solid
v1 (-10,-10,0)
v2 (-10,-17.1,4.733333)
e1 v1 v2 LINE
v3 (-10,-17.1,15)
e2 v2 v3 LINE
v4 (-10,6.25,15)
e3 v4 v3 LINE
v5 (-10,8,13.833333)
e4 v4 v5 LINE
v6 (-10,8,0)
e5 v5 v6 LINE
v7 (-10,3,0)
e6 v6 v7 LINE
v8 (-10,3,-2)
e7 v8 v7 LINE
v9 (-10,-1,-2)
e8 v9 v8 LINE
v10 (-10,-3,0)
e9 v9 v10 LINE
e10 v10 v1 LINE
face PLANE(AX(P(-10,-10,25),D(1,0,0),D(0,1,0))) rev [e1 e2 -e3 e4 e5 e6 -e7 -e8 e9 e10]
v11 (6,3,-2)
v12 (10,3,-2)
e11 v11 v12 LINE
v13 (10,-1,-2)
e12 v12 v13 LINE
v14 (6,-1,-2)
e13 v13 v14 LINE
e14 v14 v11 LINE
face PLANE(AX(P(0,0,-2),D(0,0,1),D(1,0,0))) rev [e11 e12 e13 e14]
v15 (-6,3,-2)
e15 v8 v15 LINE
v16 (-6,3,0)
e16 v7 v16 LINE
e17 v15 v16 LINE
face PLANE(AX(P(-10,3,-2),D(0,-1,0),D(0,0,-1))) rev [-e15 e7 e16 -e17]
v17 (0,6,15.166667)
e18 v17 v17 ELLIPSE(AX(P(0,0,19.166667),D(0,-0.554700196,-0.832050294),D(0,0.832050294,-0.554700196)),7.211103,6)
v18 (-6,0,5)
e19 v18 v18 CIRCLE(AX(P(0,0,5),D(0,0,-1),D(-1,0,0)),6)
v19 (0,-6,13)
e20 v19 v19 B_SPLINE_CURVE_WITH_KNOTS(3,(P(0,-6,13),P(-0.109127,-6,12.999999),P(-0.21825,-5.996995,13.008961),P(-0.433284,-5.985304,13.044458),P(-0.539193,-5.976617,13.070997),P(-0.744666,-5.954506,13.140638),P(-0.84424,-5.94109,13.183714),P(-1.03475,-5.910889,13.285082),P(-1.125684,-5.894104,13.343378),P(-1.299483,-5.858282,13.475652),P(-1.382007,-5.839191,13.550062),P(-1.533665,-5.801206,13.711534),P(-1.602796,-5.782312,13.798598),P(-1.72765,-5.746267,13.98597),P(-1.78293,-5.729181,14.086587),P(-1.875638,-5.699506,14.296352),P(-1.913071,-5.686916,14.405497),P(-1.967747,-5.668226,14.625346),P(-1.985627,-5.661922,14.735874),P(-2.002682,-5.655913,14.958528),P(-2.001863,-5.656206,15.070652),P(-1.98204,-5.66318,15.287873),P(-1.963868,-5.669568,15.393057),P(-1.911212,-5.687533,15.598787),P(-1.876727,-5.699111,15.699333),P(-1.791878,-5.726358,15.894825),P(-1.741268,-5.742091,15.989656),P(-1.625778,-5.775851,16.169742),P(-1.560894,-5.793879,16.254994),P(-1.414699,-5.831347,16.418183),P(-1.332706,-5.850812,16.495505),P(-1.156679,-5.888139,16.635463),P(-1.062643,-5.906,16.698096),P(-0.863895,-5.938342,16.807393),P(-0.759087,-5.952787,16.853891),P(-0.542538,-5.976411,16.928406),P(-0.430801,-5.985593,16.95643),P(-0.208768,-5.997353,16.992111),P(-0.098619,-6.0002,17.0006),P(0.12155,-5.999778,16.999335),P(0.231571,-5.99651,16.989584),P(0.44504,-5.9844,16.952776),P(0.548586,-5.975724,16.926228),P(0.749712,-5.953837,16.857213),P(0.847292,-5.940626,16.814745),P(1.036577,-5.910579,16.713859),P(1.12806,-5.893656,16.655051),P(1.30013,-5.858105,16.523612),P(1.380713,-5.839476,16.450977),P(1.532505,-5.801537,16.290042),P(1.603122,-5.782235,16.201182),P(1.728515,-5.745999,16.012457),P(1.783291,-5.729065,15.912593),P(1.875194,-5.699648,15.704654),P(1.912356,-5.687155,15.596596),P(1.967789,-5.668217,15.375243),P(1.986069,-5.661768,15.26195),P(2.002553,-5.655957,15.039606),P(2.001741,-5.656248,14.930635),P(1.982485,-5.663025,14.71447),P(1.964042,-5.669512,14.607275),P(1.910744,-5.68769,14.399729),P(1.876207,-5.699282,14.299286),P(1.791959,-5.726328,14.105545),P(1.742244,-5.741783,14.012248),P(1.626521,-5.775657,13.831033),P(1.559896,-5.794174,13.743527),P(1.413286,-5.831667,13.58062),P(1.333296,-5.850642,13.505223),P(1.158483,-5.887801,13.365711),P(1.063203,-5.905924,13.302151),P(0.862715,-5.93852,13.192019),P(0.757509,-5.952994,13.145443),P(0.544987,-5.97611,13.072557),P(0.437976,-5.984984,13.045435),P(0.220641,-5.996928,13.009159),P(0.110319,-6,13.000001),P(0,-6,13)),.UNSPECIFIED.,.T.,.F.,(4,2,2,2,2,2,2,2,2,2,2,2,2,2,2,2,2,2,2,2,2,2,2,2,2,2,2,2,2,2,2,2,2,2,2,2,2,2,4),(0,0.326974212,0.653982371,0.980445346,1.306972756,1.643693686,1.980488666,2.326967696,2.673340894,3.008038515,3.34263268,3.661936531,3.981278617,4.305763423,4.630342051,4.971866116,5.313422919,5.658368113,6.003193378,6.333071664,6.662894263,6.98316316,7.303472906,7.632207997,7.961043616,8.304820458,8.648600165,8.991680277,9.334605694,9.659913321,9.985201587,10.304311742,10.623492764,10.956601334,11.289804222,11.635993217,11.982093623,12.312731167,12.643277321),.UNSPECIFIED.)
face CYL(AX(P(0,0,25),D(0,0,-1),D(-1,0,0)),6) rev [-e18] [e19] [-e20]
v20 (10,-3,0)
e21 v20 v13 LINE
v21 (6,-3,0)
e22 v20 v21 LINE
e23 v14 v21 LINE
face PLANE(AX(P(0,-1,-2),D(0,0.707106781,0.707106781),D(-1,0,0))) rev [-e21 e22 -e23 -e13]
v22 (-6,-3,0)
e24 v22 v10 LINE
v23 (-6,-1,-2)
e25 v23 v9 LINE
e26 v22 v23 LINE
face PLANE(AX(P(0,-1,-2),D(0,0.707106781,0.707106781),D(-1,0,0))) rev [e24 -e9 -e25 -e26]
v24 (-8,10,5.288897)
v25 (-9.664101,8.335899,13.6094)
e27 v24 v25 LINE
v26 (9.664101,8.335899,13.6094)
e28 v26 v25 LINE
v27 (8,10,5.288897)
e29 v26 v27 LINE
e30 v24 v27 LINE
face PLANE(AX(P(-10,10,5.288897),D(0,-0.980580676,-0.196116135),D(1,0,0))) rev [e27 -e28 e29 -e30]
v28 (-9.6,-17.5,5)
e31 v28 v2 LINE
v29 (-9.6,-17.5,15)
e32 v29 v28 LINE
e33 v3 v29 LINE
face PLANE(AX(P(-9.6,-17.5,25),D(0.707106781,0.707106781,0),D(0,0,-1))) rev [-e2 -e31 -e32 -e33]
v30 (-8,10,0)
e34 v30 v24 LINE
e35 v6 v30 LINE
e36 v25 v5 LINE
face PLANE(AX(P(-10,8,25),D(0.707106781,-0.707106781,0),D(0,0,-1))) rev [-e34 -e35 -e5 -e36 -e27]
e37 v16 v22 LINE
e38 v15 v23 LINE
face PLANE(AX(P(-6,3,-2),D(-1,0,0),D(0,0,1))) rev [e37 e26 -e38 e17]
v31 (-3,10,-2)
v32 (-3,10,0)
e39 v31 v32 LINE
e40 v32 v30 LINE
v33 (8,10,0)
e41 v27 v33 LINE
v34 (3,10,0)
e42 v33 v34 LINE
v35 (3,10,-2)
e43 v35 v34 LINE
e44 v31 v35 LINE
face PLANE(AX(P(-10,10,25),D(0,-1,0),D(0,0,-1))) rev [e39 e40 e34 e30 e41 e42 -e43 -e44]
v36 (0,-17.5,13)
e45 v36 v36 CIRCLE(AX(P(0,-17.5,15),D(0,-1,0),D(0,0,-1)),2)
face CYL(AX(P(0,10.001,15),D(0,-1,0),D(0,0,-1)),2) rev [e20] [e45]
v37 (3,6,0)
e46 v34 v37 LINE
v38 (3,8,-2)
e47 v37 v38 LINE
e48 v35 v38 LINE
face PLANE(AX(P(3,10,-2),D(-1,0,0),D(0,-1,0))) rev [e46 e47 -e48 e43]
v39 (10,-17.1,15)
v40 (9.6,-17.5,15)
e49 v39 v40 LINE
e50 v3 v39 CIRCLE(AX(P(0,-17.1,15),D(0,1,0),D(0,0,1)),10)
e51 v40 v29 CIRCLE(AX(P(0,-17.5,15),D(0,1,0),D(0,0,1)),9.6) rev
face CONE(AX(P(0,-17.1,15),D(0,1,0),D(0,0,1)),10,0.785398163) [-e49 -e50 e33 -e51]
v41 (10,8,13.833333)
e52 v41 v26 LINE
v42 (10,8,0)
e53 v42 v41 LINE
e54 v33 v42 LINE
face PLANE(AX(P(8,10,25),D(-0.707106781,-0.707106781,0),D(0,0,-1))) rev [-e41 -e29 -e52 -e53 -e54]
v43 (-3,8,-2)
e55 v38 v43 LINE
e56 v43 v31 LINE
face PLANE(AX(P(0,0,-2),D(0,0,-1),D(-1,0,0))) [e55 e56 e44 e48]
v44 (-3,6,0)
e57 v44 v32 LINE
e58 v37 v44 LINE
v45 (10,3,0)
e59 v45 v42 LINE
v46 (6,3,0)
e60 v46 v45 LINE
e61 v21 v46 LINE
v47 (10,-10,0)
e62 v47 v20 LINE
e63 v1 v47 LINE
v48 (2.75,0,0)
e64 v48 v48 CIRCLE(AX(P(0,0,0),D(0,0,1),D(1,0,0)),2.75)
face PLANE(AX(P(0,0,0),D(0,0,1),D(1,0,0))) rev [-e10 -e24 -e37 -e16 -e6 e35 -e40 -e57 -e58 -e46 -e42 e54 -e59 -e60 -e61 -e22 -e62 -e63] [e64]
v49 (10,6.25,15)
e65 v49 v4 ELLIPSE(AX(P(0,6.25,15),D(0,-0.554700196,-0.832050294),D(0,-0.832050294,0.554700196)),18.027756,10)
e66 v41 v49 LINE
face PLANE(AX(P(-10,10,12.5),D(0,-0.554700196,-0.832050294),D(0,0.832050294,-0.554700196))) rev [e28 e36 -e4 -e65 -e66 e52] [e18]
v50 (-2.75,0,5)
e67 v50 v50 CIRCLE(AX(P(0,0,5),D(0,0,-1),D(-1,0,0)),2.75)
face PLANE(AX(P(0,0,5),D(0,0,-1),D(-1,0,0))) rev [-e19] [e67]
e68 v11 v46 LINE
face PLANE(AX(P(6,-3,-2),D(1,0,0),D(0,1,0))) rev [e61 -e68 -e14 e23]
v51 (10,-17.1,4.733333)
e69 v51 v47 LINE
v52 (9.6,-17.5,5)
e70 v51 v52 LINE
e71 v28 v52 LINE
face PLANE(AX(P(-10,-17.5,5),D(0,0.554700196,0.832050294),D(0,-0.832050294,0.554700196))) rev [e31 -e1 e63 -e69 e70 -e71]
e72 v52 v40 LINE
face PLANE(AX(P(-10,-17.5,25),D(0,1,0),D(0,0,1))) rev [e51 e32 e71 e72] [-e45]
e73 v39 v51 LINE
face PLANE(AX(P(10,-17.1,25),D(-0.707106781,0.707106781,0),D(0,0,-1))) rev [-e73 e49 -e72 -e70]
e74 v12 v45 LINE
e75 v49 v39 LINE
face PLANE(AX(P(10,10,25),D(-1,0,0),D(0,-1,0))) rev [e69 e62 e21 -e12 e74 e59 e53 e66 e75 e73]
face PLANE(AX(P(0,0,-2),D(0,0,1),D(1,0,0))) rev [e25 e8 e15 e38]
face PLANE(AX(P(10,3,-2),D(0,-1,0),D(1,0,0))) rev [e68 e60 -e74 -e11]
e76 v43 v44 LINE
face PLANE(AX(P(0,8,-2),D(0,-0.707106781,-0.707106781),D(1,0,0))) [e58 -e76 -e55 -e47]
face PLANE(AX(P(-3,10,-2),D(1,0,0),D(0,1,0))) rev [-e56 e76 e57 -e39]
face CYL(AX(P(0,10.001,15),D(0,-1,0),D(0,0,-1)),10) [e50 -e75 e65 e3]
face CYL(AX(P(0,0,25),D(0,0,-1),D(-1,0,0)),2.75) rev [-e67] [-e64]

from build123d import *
from OCP.BRepFilletAPI import BRepFilletAPI_MakeChamfer

# Parameters (mm, degrees)
SKETCH1_R                = 2.75
BOSS_EXTRUDE1_DEPTH      = 25
CUT_EXTRUDE1_DEPTH       = 37.486298798
CUT_EXTRUDE1_DEPTH_BACK  = 37.486298798
CUT_EXTRUDE2_START       = -5
SKETCH3_R                = 6
CUT_EXTRUDE2_DEPTH       = 28.113081447
CUT_EXTRUDE3_START       = -23.75
CUT_EXTRUDE3_DEPTH       = 23.75
CUT_EXTRUDE3_START_2     = -14.426375
CUT_EXTRUDE3_2_OUTLINE_R = 2
CUT_EXTRUDE3_2_DEPTH     = 14.426375
CHAMFER1_SIZE            = 2
CHAMFER1_SIZE2           = 7.211102551
CHAMFER2_SIZE            = 0.4
SKETCH5_W                = 6
SKETCH5_H                = 4
SKETCH5_W_2              = 4
SKETCH5_H_2              = 6
BOSS_EXTRUDE2_DEPTH      = 2
CHAMFER3_SIZE            = 2


with BuildPart() as part:
    # Sketch1 → Boss-Extrude1 (new body)
    with BuildSketch(Plane.XY):
        Polygon((-10, 10), (10, 10), (10, -10), (10, -17.5), (-10, -17.5), (-10, -10), align=None)
        Circle(SKETCH1_R, mode=Mode.SUBTRACT)
    extrude(amount=BOSS_EXTRUDE1_DEPTH)

    # Sketch2 → Cut-Extrude1 (cut, two sides: drawn at the far end of the back side and taken through both)
    with BuildSketch(Plane(origin=(10, 0, 0), x_dir=(0, 0, -1), z_dir=(1, 0, 0)).offset(-CUT_EXTRUDE1_DEPTH_BACK)):
        Polygon((-5, -17.5), (0, -10), (0, -17.5), align=None)
        Polygon((-12.5, 10), (-25, -8.75), (-25, 10), align=None)
    extrude(amount=CUT_EXTRUDE1_DEPTH + CUT_EXTRUDE1_DEPTH_BACK, mode=Mode.SUBTRACT)

    # Sketch3 → Cut-Extrude2 (cut, through all)
    with BuildSketch(Plane(origin=(0, 0, 0), x_dir=(-1, 0, 0), z_dir=(0, 0, -1)).offset(CUT_EXTRUDE2_START)):
        Circle(SKETCH3_R)
    extrude(amount=-CUT_EXTRUDE2_DEPTH, mode=Mode.SUBTRACT)

    # Cut-Extrude3: read off the stored shape, not the designer's step
    # Cut-Extrude3 outline → Cut-Extrude3 (cut)
    with BuildSketch(Plane.XZ.offset(17.5).offset(CUT_EXTRUDE3_START)):
        with BuildLine():
            ThreePointArc((-10, 15), (-7.071067812, 22.071067812), (0, 25))
            Line((0, 25), (-10, 25))
            Line((-10, 25), (-10, 15))
        make_face()
        with BuildLine():
            ThreePointArc((0, 25), (7.071067812, 22.071067812), (10, 15))
            Line((10, 15), (10, 25))
            Line((10, 25), (0, 25))
        make_face()
    extrude(amount=CUT_EXTRUDE3_DEPTH, mode=Mode.SUBTRACT)

    # Cut-Extrude3 2 outline → Cut-Extrude3 2 (cut)
    with BuildSketch(Plane.XZ.offset(17.5).offset(CUT_EXTRUDE3_START_2)):
        with Locations((0, 15)):
            Circle(CUT_EXTRUDE3_2_OUTLINE_R)
    extrude(amount=CUT_EXTRUDE3_2_DEPTH, mode=Mode.SUBTRACT)

    # Chamfer1: one chamfer whose edges measure the first distance from different faces: ONE call of the kernel's chamfer builder (chamfer() names one face for all edges)
    chamfer1_edges_1 = [part.edges().sort_by_distance(p)[0] for p in [
        (-10, 10, 6.25),
        (10, 10, 6.25),
    ]]
    chamfer1_edges_2 = [part.edges().sort_by_distance(p)[0] for p in [
        (0, 10, 12.5),
    ]]
    chamfer1_side_2 = [part.faces().sort_by_distance(p)[0] for p in [
        (-9.69870073, 8.125, 13.75),
    ]]
    chamfer1 = BRepFilletAPI_MakeChamfer(part.part.solid().wrapped)
    for e in chamfer1_edges_1:
        chamfer1.Add(CHAMFER1_SIZE, e.wrapped)
    for e in chamfer1_edges_2:
        chamfer1.Add(CHAMFER1_SIZE, CHAMFER1_SIZE2, e.wrapped, chamfer1_side_2[0].wrapped)  # the first distance lies on this face
    add(Compound.cast(chamfer1.Shape()), mode=Mode.REPLACE)

    # Chamfer2
    chamfer2_edges = [part.edges().sort_by_distance(p)[0] for p in [
        (10, -17.5, 10),
        (-7.071067812, -17.5, 22.071067812),
        (-10, -17.5, 10),
    ]]
    chamfer(chamfer2_edges, length=CHAMFER2_SIZE)

    # Sketch5 → Boss-Extrude2 (add)
    with BuildSketch(Plane(origin=(0, 0, 0), x_dir=(-1, 0, 0), z_dir=(0, 0, -1))):
        with Locations((0, 8)):
            Rectangle(SKETCH5_W, SKETCH5_H)
        with Locations((8, 0)):
            Rectangle(SKETCH5_W_2, SKETCH5_H_2)
        with Locations((-8, 0)):
            Rectangle(SKETCH5_W_2, SKETCH5_H_2)
    extrude(amount=BOSS_EXTRUDE2_DEPTH)

    # Chamfer3
    chamfer3_edges = [part.edges().sort_by_distance(p)[0] for p in [
        (-8, -3, -2),
        (0, 6, -2),
        (8, -3, -2),
    ]]
    chamfer(chamfer3_edges, length=CHAMFER3_SIZE - 0.0001)  # a hair under: the kernel refuses the full size


solid = part.part
